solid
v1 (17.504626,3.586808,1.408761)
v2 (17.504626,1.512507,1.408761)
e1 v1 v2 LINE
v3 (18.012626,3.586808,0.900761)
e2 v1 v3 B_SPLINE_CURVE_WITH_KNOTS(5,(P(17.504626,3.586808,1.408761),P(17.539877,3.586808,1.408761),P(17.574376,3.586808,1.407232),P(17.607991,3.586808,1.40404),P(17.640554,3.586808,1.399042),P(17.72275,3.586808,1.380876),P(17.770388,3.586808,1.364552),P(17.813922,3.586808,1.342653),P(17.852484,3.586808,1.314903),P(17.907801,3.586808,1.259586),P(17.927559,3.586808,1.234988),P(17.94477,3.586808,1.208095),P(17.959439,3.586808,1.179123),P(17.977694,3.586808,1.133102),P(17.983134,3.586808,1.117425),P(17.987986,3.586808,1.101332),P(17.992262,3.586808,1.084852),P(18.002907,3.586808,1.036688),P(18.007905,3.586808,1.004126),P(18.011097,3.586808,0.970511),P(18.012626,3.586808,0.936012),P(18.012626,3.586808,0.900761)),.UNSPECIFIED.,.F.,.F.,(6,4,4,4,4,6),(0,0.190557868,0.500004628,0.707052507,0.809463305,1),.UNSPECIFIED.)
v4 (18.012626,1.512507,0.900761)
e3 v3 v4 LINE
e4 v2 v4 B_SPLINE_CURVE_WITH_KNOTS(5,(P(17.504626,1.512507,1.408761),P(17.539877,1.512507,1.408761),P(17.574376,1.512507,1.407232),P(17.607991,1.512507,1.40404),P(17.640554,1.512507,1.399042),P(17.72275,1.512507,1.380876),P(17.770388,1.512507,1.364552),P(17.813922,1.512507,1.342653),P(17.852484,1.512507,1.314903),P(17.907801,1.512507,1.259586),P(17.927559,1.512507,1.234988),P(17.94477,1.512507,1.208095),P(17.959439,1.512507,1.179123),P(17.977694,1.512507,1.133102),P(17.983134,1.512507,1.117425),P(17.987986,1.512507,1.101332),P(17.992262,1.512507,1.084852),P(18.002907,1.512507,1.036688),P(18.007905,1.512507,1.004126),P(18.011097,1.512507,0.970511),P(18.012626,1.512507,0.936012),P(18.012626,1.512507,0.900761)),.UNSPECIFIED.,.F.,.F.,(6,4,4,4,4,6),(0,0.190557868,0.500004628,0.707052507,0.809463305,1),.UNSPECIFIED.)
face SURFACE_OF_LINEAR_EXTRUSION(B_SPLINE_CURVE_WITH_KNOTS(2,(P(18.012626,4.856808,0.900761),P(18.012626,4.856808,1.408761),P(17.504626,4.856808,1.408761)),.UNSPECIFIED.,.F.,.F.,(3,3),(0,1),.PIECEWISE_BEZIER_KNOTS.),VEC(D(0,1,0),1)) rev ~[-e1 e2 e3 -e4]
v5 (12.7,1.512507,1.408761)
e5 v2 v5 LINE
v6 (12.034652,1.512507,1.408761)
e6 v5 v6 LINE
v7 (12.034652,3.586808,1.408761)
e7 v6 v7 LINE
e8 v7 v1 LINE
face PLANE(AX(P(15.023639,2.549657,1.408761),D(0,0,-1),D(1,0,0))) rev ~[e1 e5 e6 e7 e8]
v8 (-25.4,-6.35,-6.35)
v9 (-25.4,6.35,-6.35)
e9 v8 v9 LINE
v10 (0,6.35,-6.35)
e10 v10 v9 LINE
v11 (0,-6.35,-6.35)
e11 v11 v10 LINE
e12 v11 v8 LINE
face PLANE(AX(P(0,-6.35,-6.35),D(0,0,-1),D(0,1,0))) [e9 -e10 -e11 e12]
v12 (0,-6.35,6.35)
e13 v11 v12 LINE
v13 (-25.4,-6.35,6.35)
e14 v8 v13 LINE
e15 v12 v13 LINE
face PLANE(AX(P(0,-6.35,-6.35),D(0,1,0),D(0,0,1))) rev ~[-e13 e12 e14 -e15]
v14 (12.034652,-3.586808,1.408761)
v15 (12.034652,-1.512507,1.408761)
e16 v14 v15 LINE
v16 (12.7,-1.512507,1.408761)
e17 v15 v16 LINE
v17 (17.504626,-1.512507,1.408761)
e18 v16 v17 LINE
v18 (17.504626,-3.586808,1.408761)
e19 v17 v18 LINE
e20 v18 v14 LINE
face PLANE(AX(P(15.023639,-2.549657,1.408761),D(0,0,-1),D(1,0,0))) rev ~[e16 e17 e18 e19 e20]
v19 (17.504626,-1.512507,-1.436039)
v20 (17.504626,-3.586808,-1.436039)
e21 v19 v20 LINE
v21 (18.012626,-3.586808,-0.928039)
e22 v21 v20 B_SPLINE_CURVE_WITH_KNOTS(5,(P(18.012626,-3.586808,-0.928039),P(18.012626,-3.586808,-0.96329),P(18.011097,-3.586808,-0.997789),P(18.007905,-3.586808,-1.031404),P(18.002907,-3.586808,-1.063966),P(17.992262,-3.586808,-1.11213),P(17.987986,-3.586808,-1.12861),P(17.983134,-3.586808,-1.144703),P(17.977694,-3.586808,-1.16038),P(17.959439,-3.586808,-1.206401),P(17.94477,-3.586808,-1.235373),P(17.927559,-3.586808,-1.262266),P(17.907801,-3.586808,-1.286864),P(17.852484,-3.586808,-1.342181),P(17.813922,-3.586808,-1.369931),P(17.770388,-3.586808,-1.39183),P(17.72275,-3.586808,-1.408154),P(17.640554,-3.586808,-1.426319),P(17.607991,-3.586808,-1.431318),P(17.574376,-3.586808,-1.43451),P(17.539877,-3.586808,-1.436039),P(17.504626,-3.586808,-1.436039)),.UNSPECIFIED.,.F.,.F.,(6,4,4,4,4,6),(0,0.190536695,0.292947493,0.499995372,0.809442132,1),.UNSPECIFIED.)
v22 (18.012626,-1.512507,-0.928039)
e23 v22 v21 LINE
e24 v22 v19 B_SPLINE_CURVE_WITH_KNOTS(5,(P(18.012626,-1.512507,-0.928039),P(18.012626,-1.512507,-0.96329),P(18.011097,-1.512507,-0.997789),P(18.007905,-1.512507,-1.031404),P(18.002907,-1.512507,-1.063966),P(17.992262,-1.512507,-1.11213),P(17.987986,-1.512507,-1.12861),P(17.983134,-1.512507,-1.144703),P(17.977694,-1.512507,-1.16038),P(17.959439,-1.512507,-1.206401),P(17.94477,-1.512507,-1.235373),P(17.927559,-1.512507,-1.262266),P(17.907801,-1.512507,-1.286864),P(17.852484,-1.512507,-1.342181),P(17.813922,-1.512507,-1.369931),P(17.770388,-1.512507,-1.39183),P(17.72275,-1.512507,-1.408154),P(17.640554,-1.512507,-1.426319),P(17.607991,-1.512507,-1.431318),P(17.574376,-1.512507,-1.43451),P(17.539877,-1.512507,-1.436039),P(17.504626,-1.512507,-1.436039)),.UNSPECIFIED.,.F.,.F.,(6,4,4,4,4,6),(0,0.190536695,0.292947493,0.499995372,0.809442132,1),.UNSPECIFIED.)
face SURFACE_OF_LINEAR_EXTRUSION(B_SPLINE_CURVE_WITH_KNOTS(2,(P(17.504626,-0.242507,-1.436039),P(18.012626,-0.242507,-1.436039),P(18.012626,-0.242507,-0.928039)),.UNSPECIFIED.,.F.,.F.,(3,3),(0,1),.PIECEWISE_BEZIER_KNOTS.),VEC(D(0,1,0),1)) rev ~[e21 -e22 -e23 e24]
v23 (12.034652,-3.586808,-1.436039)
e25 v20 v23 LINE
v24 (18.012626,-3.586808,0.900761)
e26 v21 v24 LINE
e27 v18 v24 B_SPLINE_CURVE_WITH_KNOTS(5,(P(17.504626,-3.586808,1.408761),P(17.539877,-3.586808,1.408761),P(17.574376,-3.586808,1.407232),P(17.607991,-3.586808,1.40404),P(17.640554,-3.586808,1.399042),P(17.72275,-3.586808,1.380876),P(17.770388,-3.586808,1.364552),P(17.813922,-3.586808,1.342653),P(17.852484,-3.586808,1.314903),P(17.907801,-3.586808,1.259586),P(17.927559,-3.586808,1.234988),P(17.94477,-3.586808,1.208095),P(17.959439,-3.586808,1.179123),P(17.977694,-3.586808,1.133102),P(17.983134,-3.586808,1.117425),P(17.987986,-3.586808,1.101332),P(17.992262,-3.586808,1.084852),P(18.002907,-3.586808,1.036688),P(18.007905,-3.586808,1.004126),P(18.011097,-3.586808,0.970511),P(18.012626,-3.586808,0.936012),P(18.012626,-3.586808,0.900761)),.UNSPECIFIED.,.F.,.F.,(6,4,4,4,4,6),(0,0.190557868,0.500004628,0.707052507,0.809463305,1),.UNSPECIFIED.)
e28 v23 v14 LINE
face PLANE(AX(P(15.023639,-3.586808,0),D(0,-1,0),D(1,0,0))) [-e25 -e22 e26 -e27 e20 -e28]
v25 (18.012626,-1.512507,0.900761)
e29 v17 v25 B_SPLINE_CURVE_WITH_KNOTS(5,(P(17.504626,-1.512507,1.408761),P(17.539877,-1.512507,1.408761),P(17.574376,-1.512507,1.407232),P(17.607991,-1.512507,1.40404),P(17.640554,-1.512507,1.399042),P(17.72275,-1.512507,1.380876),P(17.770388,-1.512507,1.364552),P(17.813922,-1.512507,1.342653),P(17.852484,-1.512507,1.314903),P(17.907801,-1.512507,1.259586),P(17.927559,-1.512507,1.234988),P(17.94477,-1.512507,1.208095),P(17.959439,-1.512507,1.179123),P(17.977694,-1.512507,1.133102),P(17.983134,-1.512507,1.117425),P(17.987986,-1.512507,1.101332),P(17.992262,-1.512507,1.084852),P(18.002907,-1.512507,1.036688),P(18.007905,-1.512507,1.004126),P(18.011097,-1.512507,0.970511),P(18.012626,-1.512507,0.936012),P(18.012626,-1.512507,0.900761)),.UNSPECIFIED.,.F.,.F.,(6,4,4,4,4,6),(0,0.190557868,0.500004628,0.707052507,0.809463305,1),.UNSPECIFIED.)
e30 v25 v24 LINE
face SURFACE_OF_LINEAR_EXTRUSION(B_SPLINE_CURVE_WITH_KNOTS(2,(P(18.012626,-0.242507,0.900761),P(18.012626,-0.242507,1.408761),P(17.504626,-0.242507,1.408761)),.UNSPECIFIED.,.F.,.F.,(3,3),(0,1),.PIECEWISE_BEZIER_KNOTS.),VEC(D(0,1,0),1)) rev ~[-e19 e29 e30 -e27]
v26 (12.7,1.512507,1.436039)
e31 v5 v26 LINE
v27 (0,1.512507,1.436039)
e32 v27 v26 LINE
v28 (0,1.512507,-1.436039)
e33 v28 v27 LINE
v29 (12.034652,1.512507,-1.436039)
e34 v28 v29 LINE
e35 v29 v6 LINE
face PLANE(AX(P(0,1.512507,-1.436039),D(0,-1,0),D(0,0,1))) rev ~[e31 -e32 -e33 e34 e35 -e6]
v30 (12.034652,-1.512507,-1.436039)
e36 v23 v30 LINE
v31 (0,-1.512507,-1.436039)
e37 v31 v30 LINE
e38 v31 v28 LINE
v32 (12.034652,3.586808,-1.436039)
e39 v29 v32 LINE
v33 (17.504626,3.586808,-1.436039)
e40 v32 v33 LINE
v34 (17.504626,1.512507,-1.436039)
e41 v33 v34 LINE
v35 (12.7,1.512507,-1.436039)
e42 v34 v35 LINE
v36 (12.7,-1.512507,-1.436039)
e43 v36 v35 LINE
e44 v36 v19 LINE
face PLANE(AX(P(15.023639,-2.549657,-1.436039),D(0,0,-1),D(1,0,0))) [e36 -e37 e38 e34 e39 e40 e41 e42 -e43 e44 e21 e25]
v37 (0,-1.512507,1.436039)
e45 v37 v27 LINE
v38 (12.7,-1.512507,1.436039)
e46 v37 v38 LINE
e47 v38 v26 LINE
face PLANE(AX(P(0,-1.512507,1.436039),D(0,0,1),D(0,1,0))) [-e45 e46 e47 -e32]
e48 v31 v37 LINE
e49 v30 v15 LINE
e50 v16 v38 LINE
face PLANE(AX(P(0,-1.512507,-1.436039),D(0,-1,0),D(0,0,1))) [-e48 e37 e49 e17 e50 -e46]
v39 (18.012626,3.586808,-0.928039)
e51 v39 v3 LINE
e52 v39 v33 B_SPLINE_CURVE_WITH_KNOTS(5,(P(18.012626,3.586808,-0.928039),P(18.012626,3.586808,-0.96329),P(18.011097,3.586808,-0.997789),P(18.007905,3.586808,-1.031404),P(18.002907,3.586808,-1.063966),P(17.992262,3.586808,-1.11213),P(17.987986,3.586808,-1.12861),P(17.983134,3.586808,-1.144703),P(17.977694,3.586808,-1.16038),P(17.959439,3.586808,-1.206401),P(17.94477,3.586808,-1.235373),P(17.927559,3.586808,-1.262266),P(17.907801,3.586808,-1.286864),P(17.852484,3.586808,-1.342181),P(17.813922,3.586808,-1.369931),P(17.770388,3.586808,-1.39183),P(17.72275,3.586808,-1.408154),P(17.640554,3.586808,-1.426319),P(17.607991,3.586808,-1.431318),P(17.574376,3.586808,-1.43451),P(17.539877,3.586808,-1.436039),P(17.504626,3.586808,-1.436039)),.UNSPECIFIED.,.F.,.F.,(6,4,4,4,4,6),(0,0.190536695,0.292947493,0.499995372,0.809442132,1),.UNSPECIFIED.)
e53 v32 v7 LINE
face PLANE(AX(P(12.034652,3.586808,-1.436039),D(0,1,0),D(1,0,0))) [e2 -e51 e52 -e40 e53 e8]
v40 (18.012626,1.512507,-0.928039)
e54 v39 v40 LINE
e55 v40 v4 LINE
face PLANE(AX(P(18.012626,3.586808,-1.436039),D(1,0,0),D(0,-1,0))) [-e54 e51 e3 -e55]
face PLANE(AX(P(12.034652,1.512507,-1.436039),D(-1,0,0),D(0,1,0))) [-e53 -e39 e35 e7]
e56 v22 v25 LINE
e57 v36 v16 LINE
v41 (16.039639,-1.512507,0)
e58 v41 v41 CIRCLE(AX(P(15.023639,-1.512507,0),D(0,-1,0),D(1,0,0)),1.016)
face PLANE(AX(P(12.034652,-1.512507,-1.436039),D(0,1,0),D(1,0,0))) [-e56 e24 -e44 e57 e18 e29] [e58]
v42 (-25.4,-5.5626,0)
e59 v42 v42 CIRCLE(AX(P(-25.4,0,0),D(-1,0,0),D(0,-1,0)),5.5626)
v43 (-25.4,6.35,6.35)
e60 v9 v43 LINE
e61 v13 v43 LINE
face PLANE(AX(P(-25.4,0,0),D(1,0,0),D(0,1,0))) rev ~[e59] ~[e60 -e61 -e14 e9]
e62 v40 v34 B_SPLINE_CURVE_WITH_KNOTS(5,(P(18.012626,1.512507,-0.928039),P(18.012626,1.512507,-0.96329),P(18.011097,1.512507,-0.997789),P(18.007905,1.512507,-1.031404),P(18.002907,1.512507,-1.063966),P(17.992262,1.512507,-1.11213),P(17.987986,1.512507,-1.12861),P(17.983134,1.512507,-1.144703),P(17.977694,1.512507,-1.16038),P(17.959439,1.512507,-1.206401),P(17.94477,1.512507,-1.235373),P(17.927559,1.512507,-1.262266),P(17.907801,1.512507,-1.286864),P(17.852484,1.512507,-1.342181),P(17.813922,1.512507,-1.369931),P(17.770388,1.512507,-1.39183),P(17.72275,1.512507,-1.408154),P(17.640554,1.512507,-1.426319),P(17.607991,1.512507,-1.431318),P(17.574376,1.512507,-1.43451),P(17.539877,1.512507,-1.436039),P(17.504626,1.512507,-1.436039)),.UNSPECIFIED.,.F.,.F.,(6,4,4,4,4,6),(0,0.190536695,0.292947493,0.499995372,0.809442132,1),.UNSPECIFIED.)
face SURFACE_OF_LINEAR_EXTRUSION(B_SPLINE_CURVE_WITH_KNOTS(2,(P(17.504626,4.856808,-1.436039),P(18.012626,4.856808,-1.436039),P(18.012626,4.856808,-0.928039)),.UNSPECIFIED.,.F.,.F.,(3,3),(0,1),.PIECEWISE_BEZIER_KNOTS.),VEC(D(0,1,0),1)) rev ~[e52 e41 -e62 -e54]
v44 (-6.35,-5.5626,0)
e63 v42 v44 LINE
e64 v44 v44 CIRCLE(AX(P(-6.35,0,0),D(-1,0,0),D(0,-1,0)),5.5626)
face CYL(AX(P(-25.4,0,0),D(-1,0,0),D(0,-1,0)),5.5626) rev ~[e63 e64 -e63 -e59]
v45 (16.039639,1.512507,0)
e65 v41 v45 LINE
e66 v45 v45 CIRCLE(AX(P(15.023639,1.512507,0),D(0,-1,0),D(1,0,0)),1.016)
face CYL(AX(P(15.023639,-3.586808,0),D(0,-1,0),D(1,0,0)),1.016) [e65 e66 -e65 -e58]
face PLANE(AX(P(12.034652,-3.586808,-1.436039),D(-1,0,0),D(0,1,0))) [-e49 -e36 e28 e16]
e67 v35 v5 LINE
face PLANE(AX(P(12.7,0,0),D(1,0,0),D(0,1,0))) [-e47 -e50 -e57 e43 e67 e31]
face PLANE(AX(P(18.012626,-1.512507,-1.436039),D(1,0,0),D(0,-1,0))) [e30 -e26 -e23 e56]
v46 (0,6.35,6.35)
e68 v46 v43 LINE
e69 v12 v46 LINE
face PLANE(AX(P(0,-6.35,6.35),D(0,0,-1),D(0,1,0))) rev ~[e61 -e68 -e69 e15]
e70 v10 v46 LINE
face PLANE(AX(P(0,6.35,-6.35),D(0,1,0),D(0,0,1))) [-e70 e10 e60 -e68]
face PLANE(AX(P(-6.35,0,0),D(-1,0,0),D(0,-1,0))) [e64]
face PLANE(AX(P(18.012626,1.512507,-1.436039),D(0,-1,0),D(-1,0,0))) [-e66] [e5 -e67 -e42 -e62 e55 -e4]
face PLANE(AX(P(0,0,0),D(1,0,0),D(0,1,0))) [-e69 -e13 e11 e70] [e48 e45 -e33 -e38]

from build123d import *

# Parameters (mm, degrees)
F0_W         = 12.7
F0_H         = 12.7
F1_DEPTH     = 25.4
F2_R         = 5.5626
F3_DEPTH     = 19.05
F4_W         = 3.0250146519
F4_H         = 2.872077981
F5_DEPTH     = 12.7
F7_DEPTH     = 2.8448
F8_R         = 1.016
F9_DEPTH     = 5.2832
F10_T1_DEPTH = 4.6143001951
F10_T3_DEPTH = 4.6143001951


# Not quite as in the source:
# - a fillet or chamfer that OpenCascade refuses, or shapes differently, is made with other operations: its cross-section is extruded or revolved along the edge and cut away or added


with BuildPart() as f1:
    # F0 (on Right) → F1 (new body)
    with BuildSketch(Plane.YZ):
        Rectangle(F0_W, F0_H)
    extrude(amount=-F1_DEPTH)

    # F2 (on face) → F3 (cut)
    with BuildSketch(Plane(origin=(-25.4, 0, 0), x_dir=(0, -1, 0), z_dir=(-1, 0, 0))):
        Circle(F2_R)
    extrude(amount=-F3_DEPTH, mode=Mode.SUBTRACT)

    # F4 (on face) → F5 (join)
    with BuildSketch(Plane.YZ):
        Rectangle(F4_W, F4_H)
    extrude(amount=F5_DEPTH)

    # F6 (on face) → F7 (join)
    with BuildSketch(Plane(origin=(0, 0, -1.4360389905), x_dir=(1, 0, 0), z_dir=(0, 0, -1))):
        Polygon((12.0346518233, 3.5868075211), (12.0346518233, 1.512507326), (12.7, 1.512507326), (18.0126260966, 1.512507326), (18.0126260966, 3.5868075211), align=None)
        Polygon((18.0126260966, -1.512507326), (12.7, -1.512507326), (12.0346518233, -1.512507326), (12.0346518233, -3.5868075211), (18.0126260966, -3.5868075211), align=None)
    extrude(amount=-F7_DEPTH)

    # F8 (on face) → F9 (join)
    with BuildSketch(Plane.XZ.offset(3.5868075211)):
        with Locations((15.02363896, 0)):
            Circle(F8_R)
    extrude(amount=-F9_DEPTH)

    # F10: fillet of radius 0.508 on 4 edges, made by hand

    # F10_s2 → F10_t1 (cut)
    with BuildSketch(Plane.XZ.offset(0.242507326)):
        with BuildLine():
            add(Edge.make_bspline(
                [(17.5046260966, -1.4360389905), (18.0126260966, -1.4360389905), (18.0126260966, -0.9280389905)],
                knots=[0, 0, 0, 1, 1, 1], degree=2, weights=[1, 1, 1]))
            Line((18.0126260966, -0.9280389905), (18.0126260966, -1.4360389905))
            Line((18.0126260966, -1.4360389905), (17.5046260966, -1.4360389905))
        make_face()
        with BuildLine():
            add(Edge.make_bspline(
                [(18.0126260966, 0.9007610095), (18.0126260966, 1.4087610095), (17.5046260966, 1.4087610095)],
                knots=[0, 0, 0, 1, 1, 1], degree=2, weights=[1, 1, 1]))
            Line((17.5046260966, 1.4087610095), (18.0126260966, 1.4087610095))
            Line((18.0126260966, 1.4087610095), (18.0126260966, 0.9007610095))
        make_face()
    extrude(amount=F10_T1_DEPTH, mode=Mode.SUBTRACT)

    # F10_s4 → F10_t3 (cut)
    with BuildSketch(Plane.XZ.offset(-4.8568075211)):
        with BuildLine():
            add(Edge.make_bspline(
                [(17.5046260966, -1.4360389905), (18.0126260966, -1.4360389905), (18.0126260966, -0.9280389905)],
                knots=[0, 0, 0, 1, 1, 1], degree=2, weights=[1, 1, 1]))
            Line((18.0126260966, -0.9280389905), (18.0126260966, -1.4360389905))
            Line((18.0126260966, -1.4360389905), (17.5046260966, -1.4360389905))
        make_face()
        with BuildLine():
            add(Edge.make_bspline(
                [(18.0126260966, 0.9007610095), (18.0126260966, 1.4087610095), (17.5046260966, 1.4087610095)],
                knots=[0, 0, 0, 1, 1, 1], degree=2, weights=[1, 1, 1]))
            Line((17.5046260966, 1.4087610095), (18.0126260966, 1.4087610095))
            Line((18.0126260966, 1.4087610095), (18.0126260966, 0.9007610095))
        make_face()
    extrude(amount=F10_T3_DEPTH, mode=Mode.SUBTRACT)


solid = f1.part
